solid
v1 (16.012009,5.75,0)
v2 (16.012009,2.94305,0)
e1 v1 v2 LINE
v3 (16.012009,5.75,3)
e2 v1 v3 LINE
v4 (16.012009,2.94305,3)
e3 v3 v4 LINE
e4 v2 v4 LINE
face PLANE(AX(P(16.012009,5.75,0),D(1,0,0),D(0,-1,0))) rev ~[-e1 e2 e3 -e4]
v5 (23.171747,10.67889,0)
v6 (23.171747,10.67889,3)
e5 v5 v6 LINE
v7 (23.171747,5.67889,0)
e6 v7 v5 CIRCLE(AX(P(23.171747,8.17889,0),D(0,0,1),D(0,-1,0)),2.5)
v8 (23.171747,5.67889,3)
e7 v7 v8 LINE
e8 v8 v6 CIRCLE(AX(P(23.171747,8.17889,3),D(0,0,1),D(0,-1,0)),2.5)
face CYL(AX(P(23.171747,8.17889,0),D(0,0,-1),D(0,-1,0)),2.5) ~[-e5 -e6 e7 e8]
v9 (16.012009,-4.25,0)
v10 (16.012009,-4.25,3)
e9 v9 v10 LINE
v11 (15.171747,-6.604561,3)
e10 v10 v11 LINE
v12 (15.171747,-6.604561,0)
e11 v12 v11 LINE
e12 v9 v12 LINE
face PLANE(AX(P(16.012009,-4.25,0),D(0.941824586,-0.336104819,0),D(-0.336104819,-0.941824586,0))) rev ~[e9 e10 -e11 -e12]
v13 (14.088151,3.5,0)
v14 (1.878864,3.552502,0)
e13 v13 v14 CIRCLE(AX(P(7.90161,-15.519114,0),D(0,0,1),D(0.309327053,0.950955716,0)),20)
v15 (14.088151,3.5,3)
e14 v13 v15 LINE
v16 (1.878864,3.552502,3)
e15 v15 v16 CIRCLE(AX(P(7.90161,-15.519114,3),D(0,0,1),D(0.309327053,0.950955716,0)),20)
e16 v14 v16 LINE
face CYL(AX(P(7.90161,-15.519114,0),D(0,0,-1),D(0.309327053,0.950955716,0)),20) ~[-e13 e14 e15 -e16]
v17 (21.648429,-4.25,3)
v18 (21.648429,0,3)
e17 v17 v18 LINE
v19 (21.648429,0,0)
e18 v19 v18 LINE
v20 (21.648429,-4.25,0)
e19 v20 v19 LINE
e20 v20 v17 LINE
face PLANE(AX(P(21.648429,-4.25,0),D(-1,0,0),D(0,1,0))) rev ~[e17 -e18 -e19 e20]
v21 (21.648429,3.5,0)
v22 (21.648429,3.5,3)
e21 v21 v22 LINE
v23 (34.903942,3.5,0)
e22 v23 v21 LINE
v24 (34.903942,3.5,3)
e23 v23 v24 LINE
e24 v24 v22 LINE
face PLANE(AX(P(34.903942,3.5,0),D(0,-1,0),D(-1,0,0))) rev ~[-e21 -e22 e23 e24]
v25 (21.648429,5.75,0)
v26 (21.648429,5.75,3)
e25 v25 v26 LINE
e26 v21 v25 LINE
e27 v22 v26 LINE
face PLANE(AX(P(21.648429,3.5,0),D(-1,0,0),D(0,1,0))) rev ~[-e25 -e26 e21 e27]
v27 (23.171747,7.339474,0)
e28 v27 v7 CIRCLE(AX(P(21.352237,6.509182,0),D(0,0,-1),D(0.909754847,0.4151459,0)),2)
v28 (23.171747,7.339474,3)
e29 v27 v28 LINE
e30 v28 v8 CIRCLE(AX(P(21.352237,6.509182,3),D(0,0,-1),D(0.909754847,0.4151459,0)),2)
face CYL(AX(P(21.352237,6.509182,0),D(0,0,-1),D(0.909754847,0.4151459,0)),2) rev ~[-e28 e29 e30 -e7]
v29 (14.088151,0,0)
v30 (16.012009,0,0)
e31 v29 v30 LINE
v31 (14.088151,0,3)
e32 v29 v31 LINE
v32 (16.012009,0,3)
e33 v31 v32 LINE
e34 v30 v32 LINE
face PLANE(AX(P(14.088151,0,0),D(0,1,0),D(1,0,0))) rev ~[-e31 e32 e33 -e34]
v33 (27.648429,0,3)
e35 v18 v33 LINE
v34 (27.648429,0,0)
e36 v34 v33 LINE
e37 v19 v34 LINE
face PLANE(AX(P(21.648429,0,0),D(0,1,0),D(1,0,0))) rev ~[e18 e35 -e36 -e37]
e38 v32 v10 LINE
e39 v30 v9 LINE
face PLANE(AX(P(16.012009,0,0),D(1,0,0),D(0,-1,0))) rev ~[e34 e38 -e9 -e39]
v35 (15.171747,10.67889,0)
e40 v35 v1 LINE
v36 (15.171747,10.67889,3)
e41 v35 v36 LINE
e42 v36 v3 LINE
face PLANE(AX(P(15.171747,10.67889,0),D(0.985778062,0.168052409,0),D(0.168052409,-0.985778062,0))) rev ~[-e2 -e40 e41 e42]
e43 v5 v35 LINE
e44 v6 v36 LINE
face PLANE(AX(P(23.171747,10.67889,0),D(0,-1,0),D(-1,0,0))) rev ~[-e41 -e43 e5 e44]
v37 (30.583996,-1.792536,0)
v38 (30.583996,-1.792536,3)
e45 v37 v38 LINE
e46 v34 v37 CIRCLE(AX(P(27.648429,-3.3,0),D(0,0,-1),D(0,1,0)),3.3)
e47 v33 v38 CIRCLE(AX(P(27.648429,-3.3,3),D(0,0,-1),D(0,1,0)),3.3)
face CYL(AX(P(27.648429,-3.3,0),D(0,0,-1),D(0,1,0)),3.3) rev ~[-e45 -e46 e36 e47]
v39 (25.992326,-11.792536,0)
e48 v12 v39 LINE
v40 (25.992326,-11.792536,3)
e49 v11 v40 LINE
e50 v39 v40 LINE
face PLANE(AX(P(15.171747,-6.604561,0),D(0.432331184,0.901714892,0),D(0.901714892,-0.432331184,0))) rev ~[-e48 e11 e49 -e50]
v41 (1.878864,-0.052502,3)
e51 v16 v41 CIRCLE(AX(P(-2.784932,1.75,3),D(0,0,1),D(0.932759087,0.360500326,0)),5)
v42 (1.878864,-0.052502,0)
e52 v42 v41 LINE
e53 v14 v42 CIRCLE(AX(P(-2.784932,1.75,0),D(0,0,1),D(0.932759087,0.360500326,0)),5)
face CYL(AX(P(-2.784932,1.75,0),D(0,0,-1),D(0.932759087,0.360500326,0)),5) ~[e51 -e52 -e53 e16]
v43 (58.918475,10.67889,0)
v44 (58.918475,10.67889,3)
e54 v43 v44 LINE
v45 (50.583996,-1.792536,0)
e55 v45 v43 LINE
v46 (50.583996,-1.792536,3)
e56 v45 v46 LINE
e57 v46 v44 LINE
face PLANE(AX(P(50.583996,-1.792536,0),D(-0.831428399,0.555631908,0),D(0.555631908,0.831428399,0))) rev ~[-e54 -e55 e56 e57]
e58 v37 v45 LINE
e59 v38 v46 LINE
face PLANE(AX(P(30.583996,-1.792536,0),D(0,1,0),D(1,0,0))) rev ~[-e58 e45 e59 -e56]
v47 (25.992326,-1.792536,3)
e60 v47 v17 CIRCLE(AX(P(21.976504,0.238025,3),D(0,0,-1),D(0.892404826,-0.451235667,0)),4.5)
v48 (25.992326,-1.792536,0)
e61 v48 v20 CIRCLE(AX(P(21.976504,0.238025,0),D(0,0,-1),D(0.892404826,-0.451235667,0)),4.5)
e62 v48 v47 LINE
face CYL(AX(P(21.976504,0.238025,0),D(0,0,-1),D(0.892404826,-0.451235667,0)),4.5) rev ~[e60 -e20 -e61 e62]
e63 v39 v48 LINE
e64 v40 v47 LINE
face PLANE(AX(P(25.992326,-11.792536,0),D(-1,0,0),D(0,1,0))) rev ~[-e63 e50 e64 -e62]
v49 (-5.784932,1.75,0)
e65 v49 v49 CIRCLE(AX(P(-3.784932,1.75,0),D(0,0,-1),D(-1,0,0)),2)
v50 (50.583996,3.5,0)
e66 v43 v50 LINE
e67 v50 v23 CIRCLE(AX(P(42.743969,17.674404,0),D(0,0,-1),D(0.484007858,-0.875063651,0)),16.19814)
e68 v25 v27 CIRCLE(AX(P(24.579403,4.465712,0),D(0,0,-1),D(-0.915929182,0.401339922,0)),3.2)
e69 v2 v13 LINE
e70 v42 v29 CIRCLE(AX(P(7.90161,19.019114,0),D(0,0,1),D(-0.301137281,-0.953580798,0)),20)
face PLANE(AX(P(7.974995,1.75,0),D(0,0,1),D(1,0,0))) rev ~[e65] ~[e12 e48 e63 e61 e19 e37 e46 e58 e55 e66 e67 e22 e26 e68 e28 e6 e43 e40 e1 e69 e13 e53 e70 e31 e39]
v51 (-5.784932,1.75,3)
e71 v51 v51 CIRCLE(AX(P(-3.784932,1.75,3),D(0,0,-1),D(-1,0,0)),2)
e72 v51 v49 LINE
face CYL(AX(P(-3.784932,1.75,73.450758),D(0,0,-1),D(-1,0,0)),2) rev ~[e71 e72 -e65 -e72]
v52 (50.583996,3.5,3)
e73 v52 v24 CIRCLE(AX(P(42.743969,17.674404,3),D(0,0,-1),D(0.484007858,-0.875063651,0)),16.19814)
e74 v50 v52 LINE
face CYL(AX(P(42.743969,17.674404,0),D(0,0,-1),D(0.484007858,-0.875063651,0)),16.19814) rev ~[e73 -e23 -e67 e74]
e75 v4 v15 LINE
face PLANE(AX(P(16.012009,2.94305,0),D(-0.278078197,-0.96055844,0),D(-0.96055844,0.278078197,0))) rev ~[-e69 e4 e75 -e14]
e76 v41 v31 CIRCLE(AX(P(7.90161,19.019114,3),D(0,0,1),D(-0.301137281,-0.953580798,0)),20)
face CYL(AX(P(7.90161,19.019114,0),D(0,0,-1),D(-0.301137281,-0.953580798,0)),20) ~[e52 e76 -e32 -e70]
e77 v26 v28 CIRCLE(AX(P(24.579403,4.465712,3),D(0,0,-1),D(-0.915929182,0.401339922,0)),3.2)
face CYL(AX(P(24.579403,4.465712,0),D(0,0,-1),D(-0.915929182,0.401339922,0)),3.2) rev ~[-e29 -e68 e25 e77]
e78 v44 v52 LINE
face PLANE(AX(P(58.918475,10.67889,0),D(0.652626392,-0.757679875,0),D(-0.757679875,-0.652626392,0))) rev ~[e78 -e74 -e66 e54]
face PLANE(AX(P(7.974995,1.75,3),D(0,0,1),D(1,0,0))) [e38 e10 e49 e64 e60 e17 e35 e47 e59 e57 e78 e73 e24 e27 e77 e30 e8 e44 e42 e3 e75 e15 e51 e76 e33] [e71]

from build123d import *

# Parameters (mm, degrees)
F1_DEPTH = 3
F3_D     = 4


# Not quite as in the source:
# - a feature names something its author has since deleted; it is built from what else it names


with BuildPart() as f1:
    # F0 (on Top) → F1 (new body)
    with BuildSketch(Plane.XY):
        with BuildLine():
            Line((14.0881506171, 0), (14.0881506171, 3.5))
            ThreePointArc((14.0881506171, 3.5), (7.9876115371, 4.4807007673), (1.8788639221, 3.5525016304))
            ThreePointArc((1.8788639221, 3.5525016304), (2.1302987541, 2.666794093), (2.2150684857, 1.75))
            ThreePointArc((2.2150684857, 1.75), (2.1302987541, 0.833205907), (1.8788639221, -0.0525016304))
            ThreePointArc((1.8788639221, -0.0525016304), (7.9876115371, -0.9807007673), (14.0881506171, 0))
        make_face()
        with BuildLine():
            Line((21.6484292713, 3.5), (21.6484292713, 0))
            Line((21.6484292713, 0), (27.6484292713, 0))
            ThreePointArc((27.6484292713, 0), (29.3682210792, -0.4835632197), (30.5839958787, -1.7925356741))
            Line((30.5839958787, -1.7925356741), (50.5839958787, -1.7925356741))
            Line((50.5839958787, -1.7925356741), (58.9184745012, 10.6788903105))
            Line((58.9184745012, 10.6788903105), (50.5839958787, 3.5))
            ThreePointArc((50.5839958787, 3.5), (42.7439688076, 1.4762635236), (34.9039417364, 3.5))
            Line((34.9039417364, 3.5), (21.6484292713, 3.5))
        make_face()
        with BuildLine():
            Line((16.0120092332, 2.9430498835), (14.0881506171, 3.5))
            Line((14.0881506171, 3.5), (14.0881506171, 0))
            Line((14.0881506171, 0), (16.0120092332, 0))
            Line((16.0120092332, 0), (16.0120092332, -4.25))
            Line((16.0120092332, -4.25), (15.1717471866, -6.6045614651))
            Line((15.1717471866, -6.6045614651), (25.9923258961, -11.7925356741))
            Line((25.9923258961, -11.7925356741), (25.9923258961, -1.7925356741))
            ThreePointArc((25.9923258961, -1.7925356741), (24.192277602, -3.6786508222), (21.6484292713, -4.25))
            Line((21.6484292713, -4.25), (21.6484292713, 0))
            Line((21.6484292713, 0), (21.6484292713, 3.5))
            Line((21.6484292713, 3.5), (21.6484292713, 5.75))
            ThreePointArc((21.6484292713, 5.75), (22.2690927393, 6.6798640271), (23.1717471866, 7.3394739101))
            ThreePointArc((23.1717471866, 7.3394739101), (23.3522374925, 6.5091821103), (23.1717471866, 5.6788903105))
            ThreePointArc((23.1717471866, 5.6788903105), (25.6717471866, 8.1788903105), (23.1717471866, 10.6788903105))
            Line((23.1717471866, 10.6788903105), (15.1717471866, 10.6788903105))
            Line((15.1717471866, 10.6788903105), (16.0120092332, 5.75))
            Line((16.0120092332, 5.75), (16.0120092332, 2.9430498835))
        make_face()
        with BuildLine():
            ThreePointArc((1.7150684857, 3.5), (1.7969097631, 3.5264269002), (1.8788639221, 3.5525016304))
            ThreePointArc((1.8788639221, 3.5525016304), (-7.7849315143, 1.75), (1.8788639221, -0.0525016304))
            ThreePointArc((1.8788639221, -0.0525016304), (1.7969097631, -0.0264269002), (1.7150684857, 0))
            Line((1.7150684857, 0), (1.7150684857, 1.75))
            Line((1.7150684857, 1.75), (1.7150684857, 3.5))
        make_face()
        with BuildLine():
            ThreePointArc((2.2150684857, 1.75), (2.1302987541, 2.666794093), (1.8788639221, 3.5525016304))
            ThreePointArc((1.8788639221, 3.5525016304), (1.7969097631, 3.5264269002), (1.7150684857, 3.5))
            Line((1.7150684857, 3.5), (1.7150684857, 1.75))
            Line((1.7150684857, 1.75), (2.2150684857, 1.75))
        make_face()
        with BuildLine():
            ThreePointArc((1.8788639221, -0.0525016304), (2.1302987541, 0.833205907), (2.2150684857, 1.75))
            Line((2.2150684857, 1.75), (1.7150684857, 1.75))
            Line((1.7150684857, 1.75), (1.7150684857, 0))
            ThreePointArc((1.7150684857, 0), (1.7969097631, -0.0264269002), (1.8788639221, -0.0525016304))
        make_face()
    extrude(amount=F1_DEPTH)

    # F3 (through all)
    with Locations(Plane.XY.offset(3)):
        with Locations((-3.7849315143, 1.7499999964)):
            Hole(F3_D / 2)


solid = f1.part
